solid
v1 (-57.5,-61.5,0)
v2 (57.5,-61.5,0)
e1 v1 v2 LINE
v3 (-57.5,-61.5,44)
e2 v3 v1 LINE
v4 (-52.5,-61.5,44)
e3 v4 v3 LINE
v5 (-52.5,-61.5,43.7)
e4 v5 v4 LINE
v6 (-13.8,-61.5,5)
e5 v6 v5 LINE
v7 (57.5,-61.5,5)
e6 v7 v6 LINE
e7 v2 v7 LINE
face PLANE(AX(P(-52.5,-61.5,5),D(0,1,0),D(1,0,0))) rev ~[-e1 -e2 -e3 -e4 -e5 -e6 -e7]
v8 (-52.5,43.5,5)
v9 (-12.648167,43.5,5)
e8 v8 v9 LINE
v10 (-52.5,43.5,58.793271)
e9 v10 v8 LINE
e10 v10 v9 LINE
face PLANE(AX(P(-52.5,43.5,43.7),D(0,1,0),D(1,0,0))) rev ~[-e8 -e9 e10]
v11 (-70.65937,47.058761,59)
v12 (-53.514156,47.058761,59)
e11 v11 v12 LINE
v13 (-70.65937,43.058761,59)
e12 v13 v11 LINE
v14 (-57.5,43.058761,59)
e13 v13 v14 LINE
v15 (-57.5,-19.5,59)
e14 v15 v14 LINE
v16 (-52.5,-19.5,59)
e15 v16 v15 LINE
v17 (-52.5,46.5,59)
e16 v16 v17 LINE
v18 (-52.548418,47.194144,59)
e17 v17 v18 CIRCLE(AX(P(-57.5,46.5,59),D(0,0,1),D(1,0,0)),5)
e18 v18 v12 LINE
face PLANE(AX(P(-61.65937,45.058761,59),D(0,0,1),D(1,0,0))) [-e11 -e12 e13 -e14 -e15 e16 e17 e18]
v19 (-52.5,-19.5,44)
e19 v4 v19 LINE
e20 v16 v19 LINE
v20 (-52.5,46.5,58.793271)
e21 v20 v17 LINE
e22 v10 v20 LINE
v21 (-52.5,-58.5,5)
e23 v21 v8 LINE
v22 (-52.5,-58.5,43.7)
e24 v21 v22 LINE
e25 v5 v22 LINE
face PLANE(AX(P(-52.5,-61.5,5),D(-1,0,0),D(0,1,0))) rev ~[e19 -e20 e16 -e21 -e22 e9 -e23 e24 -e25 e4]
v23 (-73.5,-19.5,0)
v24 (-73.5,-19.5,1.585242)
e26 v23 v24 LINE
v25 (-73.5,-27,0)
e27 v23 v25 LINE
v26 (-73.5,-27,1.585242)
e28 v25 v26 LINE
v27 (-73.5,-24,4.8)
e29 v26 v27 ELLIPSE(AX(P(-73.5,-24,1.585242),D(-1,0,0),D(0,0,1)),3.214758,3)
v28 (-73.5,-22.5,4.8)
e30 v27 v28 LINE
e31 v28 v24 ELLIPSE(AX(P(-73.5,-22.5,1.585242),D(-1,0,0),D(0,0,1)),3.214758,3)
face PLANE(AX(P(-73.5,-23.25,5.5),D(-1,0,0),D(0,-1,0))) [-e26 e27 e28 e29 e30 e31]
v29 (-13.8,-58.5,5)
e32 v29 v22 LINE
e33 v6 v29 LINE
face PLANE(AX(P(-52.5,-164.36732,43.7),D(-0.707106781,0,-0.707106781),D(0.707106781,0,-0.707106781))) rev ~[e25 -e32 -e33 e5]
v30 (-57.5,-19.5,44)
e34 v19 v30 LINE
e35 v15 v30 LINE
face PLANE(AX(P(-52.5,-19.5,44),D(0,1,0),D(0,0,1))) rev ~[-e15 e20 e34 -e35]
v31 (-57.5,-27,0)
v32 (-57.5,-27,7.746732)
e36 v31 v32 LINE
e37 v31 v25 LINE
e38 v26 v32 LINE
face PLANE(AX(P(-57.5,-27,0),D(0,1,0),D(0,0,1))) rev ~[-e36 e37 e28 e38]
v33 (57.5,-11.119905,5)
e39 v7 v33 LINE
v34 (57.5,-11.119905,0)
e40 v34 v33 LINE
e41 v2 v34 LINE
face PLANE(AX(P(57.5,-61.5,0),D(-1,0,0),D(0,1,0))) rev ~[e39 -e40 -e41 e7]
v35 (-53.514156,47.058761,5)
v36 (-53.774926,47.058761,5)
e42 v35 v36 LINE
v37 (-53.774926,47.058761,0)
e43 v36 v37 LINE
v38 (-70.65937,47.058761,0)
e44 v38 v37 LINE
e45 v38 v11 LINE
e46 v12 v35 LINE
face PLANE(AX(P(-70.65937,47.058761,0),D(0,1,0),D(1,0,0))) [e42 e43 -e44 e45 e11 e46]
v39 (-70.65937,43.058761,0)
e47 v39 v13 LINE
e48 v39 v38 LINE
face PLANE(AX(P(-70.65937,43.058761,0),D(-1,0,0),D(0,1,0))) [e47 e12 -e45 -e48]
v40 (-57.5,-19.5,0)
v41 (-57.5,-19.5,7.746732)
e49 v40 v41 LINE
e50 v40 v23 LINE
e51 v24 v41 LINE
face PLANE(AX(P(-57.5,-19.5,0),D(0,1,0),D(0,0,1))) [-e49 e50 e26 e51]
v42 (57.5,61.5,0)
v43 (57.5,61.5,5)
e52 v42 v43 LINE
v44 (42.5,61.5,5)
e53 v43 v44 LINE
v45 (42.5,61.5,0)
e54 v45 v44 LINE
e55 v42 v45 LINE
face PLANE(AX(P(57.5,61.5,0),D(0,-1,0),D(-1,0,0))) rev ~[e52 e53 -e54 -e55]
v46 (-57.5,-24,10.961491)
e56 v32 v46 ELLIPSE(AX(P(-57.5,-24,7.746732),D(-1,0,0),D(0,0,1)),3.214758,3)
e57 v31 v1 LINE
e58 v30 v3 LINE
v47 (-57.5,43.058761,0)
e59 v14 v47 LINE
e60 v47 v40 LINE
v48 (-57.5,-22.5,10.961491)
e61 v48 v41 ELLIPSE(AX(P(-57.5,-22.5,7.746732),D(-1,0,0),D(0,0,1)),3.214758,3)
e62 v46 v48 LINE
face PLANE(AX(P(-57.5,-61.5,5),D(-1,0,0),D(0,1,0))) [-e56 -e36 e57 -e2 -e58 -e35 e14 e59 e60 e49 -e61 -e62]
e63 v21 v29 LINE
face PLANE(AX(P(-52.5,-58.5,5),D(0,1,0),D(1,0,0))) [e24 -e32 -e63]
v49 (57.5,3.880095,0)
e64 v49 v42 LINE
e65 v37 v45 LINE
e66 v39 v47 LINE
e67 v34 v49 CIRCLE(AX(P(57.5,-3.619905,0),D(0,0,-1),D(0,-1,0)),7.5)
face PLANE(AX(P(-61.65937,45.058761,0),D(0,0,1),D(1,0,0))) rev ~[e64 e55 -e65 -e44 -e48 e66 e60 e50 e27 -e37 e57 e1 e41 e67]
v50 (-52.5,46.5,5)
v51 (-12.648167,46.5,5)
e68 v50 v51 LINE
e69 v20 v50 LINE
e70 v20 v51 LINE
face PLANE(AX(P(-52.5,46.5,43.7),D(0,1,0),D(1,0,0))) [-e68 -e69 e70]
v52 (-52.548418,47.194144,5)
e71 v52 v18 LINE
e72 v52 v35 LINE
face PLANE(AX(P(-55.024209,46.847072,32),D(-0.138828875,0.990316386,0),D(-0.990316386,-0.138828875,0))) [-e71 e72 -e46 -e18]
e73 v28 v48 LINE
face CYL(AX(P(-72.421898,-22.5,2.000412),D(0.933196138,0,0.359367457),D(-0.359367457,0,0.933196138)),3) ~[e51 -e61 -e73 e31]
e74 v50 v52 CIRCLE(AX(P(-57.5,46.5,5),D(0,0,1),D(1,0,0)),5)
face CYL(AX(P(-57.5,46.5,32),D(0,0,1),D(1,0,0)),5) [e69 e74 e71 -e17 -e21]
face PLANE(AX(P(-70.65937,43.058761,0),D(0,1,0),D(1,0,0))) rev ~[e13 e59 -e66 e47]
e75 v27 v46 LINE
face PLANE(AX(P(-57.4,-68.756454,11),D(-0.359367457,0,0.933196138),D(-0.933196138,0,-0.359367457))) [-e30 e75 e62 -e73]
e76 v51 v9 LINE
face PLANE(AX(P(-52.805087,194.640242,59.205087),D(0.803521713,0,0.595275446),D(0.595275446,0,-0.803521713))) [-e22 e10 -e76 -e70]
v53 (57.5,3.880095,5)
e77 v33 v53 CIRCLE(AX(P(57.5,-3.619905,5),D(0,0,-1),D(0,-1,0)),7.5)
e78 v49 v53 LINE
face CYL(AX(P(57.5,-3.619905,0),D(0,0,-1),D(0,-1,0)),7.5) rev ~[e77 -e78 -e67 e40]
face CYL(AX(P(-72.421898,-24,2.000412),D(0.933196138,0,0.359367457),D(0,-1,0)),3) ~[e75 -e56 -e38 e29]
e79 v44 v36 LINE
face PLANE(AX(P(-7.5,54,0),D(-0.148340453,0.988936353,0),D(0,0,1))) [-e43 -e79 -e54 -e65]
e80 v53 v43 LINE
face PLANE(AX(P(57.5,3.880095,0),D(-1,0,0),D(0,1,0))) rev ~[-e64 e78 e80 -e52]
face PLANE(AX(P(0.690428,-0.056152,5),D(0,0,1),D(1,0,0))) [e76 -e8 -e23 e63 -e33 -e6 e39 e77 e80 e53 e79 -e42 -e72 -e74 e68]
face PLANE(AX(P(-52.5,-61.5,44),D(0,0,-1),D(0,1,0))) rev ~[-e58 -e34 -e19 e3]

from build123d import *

# Parameters (mm, degrees)
F1_DEPTH     = 5
F2_SIZE2     = 100
F2_SIZE      = 15
F3_W         = 5
F3_H         = 108
F4_DEPTH     = 54
F4_FACE_W    = 5
F4_FACE_H    = 54
F5_ANGLE     = 7.9800839779
F6_W         = 42
F6_H         = 15
F7_DEPTH     = 25
F8_W         = 7.5
F8_H         = 11
F9_DEPTH     = 16
F10_T4_DEPTH = 91.0129088322
F11_R        = 3
F12_W        = 18
F12_H        = 4
F13_DEPTH    = 59
F14_W        = 40
F14_H        = 3
F15_DEPTH    = 38.7
F16_DEPTH    = 15.2
F17_T1_DEPTH = 208.7346390373
F17_T6_DEPTH = 207.8673195186
F18_T4_DEPTH = 299.280483699


# Not quite as in the source:
# - a fillet or chamfer that OpenCascade refuses, or shapes differently, is made with other operations: its cross-section is extruded or revolved along the edge and cut away or added


with BuildPart() as f1:
    # F0 (on Top) → F1 (new body)
    with BuildSketch(Plane.XY):
        with BuildLine():
            Line((57.5, 3.8800953701), (57.5, 61.5))
            Line((57.5, 61.5), (-57.5, 61.5))
            Line((-57.5, 61.5), (-57.5, -61.5))
            Line((-57.5, -61.5), (57.5, -61.5))
            Line((57.5, -61.5), (57.5, -11.1199046299))
            ThreePointArc((57.5, -11.1199046299), (50, -3.6199046299), (57.5, 3.8800953701))
        make_face()
    extrude(amount=F1_DEPTH)

    # F2
    f2_edges = [f1.edges().sort_by_distance(p)[0] for p in [
        (-57.5, 61.5, 2.5),
    ]]
    f2_side = f1.faces().sort_by_distance((-57.5, 0, 2.5))[0]
    chamfer(f2_edges, length=F2_SIZE, length2=F2_SIZE2, reference=f2_side)

    # F3 (on face) → F4 (join)
    with BuildSketch(Plane.XY.offset(5)):
        with Locations((-55, -7.5)):
            Rectangle(F3_W, F3_H)
    extrude(amount=F4_DEPTH)

    # F4_face (on face) → F5 (revolve)
    with BuildSketch(Plane(origin=(-55, 46.5, 32), x_dir=(-1, 0, 0), z_dir=(0, 1, 0))):
        Rectangle(F4_FACE_W, F4_FACE_H)
    revolve(axis=Axis((-57.5, 46.5, 32), (0, 0, 1)), revolution_arc=F5_ANGLE)

    # F6 (on face) → F7 (cut)
    with BuildSketch(Plane.YZ.offset(-52.5)):
        with Locations((-40.5, 51.5)):
            Rectangle(F6_W, F6_H)
    extrude(amount=-F7_DEPTH, mode=Mode.SUBTRACT)

    # F8 (on face) → F9 (join)
    with BuildSketch(Plane(origin=(-57.5, 0, 0), x_dir=(0, -1, 0), z_dir=(-1, 0, 0))):
        with Locations((23.25, 5.5)):
            Rectangle(F8_W, F8_H)
    extrude(amount=F9_DEPTH)

    # F10: chamfer of 16.1 x 6.2 on 1 edges, made by hand


with BuildPart() as f10_tool2:
    # F10_s3 → F10_t4 (new body)
    with BuildSketch(Plane.XZ.offset(68.7564544161)):
        Polygon((-57.4, 11), (-73.5, 4.8), (-73.5, 11), align=None)
    extrude(amount=-F10_T4_DEPTH)

    split(bisect_by=Plane.YZ.offset(-57.5), keep=Keep.BOTTOM)


with BuildPart() as f1_1:
    add(f1.part)

    # F10_t1: cut F10_tool2
    add(f10_tool2.part, mode=Mode.SUBTRACT)

    # F11
    f11_edges = [f1_1.edges().sort_by_distance(p)[0] for p in [
        (-65.5, -27, 7.880745),
        (-65.5, -19.5, 7.880745),
    ]]
    fillet(f11_edges, radius=F11_R)

    # F12 (on Top) → F13 (join)
    with BuildSketch(Plane.XY):
        with Locations((-61.6593700051, 45.0587611198)):
            Rectangle(F12_W, F12_H)
    extrude(amount=F13_DEPTH)

    # F14 (on face) → F15 (join)
    with BuildSketch(Plane.XY.offset(5)):
        with Locations((-32.5, -60)):
            Rectangle(F14_W, F14_H)
        with Locations((-32.5, 45)):
            Rectangle(F14_W, F14_H)
    extrude(amount=F15_DEPTH)

    # F16 (add): a face of the model
    f16_faces = [f1_1.faces().sort_by_distance(p)[0] for p in [
        (-32.5, 45, 43.7),
    ]]
    extrude(f16_faces, amount=F16_DEPTH)

    # F17: chamfer of 40 on 2 edges, made by hand

    # F17_s2 → F17_t1 (cut)
    with BuildSketch(Plane.XZ.offset(-149.3673195186)):
        Polygon((-52.5, 58.9), (-12.5, 18.9), (-12.5, 58.9), align=None)
    extrude(amount=F17_T1_DEPTH, mode=Mode.SUBTRACT)


with BuildPart() as f17_tool4:
    # F17_s5 → F17_t6 (new body)
    with BuildSketch(Plane.XZ.offset(164.3673195186)):
        Polygon((-52.5, 43.7), (-12.5, 3.7), (-12.5, 43.7), align=None)
    extrude(amount=-F17_T6_DEPTH)

    split(bisect_by=Plane.XY.offset(5), keep=Keep.TOP)


with BuildPart() as f1_2:
    add(f1_1.part)

    # F17_t3: cut F17_tool4
    add(f17_tool4.part, mode=Mode.SUBTRACT)

    # F18: chamfer of 14.1 x 57 on 1 edges, made by hand


with BuildPart() as f18_tool2:
    # F18_s3 → F18_t4 (new body)
    with BuildSketch(Plane.XZ.offset(-194.6402418495)):
        Polygon((-52.8050865276, 59.2050865276), (-12.5, 4.8), (-12.5, 18.9), align=None)
    extrude(amount=F18_T4_DEPTH)

    split(bisect_by=Plane.XY.offset(5), keep=Keep.TOP)

    split(bisect_by=Plane.YZ.offset(-52.5), keep=Keep.TOP)


with BuildPart() as f1_3:
    add(f1_2.part)

    # F18_t1: cut F18_tool2
    add(f18_tool2.part, mode=Mode.SUBTRACT)


solid = f1_3.part
